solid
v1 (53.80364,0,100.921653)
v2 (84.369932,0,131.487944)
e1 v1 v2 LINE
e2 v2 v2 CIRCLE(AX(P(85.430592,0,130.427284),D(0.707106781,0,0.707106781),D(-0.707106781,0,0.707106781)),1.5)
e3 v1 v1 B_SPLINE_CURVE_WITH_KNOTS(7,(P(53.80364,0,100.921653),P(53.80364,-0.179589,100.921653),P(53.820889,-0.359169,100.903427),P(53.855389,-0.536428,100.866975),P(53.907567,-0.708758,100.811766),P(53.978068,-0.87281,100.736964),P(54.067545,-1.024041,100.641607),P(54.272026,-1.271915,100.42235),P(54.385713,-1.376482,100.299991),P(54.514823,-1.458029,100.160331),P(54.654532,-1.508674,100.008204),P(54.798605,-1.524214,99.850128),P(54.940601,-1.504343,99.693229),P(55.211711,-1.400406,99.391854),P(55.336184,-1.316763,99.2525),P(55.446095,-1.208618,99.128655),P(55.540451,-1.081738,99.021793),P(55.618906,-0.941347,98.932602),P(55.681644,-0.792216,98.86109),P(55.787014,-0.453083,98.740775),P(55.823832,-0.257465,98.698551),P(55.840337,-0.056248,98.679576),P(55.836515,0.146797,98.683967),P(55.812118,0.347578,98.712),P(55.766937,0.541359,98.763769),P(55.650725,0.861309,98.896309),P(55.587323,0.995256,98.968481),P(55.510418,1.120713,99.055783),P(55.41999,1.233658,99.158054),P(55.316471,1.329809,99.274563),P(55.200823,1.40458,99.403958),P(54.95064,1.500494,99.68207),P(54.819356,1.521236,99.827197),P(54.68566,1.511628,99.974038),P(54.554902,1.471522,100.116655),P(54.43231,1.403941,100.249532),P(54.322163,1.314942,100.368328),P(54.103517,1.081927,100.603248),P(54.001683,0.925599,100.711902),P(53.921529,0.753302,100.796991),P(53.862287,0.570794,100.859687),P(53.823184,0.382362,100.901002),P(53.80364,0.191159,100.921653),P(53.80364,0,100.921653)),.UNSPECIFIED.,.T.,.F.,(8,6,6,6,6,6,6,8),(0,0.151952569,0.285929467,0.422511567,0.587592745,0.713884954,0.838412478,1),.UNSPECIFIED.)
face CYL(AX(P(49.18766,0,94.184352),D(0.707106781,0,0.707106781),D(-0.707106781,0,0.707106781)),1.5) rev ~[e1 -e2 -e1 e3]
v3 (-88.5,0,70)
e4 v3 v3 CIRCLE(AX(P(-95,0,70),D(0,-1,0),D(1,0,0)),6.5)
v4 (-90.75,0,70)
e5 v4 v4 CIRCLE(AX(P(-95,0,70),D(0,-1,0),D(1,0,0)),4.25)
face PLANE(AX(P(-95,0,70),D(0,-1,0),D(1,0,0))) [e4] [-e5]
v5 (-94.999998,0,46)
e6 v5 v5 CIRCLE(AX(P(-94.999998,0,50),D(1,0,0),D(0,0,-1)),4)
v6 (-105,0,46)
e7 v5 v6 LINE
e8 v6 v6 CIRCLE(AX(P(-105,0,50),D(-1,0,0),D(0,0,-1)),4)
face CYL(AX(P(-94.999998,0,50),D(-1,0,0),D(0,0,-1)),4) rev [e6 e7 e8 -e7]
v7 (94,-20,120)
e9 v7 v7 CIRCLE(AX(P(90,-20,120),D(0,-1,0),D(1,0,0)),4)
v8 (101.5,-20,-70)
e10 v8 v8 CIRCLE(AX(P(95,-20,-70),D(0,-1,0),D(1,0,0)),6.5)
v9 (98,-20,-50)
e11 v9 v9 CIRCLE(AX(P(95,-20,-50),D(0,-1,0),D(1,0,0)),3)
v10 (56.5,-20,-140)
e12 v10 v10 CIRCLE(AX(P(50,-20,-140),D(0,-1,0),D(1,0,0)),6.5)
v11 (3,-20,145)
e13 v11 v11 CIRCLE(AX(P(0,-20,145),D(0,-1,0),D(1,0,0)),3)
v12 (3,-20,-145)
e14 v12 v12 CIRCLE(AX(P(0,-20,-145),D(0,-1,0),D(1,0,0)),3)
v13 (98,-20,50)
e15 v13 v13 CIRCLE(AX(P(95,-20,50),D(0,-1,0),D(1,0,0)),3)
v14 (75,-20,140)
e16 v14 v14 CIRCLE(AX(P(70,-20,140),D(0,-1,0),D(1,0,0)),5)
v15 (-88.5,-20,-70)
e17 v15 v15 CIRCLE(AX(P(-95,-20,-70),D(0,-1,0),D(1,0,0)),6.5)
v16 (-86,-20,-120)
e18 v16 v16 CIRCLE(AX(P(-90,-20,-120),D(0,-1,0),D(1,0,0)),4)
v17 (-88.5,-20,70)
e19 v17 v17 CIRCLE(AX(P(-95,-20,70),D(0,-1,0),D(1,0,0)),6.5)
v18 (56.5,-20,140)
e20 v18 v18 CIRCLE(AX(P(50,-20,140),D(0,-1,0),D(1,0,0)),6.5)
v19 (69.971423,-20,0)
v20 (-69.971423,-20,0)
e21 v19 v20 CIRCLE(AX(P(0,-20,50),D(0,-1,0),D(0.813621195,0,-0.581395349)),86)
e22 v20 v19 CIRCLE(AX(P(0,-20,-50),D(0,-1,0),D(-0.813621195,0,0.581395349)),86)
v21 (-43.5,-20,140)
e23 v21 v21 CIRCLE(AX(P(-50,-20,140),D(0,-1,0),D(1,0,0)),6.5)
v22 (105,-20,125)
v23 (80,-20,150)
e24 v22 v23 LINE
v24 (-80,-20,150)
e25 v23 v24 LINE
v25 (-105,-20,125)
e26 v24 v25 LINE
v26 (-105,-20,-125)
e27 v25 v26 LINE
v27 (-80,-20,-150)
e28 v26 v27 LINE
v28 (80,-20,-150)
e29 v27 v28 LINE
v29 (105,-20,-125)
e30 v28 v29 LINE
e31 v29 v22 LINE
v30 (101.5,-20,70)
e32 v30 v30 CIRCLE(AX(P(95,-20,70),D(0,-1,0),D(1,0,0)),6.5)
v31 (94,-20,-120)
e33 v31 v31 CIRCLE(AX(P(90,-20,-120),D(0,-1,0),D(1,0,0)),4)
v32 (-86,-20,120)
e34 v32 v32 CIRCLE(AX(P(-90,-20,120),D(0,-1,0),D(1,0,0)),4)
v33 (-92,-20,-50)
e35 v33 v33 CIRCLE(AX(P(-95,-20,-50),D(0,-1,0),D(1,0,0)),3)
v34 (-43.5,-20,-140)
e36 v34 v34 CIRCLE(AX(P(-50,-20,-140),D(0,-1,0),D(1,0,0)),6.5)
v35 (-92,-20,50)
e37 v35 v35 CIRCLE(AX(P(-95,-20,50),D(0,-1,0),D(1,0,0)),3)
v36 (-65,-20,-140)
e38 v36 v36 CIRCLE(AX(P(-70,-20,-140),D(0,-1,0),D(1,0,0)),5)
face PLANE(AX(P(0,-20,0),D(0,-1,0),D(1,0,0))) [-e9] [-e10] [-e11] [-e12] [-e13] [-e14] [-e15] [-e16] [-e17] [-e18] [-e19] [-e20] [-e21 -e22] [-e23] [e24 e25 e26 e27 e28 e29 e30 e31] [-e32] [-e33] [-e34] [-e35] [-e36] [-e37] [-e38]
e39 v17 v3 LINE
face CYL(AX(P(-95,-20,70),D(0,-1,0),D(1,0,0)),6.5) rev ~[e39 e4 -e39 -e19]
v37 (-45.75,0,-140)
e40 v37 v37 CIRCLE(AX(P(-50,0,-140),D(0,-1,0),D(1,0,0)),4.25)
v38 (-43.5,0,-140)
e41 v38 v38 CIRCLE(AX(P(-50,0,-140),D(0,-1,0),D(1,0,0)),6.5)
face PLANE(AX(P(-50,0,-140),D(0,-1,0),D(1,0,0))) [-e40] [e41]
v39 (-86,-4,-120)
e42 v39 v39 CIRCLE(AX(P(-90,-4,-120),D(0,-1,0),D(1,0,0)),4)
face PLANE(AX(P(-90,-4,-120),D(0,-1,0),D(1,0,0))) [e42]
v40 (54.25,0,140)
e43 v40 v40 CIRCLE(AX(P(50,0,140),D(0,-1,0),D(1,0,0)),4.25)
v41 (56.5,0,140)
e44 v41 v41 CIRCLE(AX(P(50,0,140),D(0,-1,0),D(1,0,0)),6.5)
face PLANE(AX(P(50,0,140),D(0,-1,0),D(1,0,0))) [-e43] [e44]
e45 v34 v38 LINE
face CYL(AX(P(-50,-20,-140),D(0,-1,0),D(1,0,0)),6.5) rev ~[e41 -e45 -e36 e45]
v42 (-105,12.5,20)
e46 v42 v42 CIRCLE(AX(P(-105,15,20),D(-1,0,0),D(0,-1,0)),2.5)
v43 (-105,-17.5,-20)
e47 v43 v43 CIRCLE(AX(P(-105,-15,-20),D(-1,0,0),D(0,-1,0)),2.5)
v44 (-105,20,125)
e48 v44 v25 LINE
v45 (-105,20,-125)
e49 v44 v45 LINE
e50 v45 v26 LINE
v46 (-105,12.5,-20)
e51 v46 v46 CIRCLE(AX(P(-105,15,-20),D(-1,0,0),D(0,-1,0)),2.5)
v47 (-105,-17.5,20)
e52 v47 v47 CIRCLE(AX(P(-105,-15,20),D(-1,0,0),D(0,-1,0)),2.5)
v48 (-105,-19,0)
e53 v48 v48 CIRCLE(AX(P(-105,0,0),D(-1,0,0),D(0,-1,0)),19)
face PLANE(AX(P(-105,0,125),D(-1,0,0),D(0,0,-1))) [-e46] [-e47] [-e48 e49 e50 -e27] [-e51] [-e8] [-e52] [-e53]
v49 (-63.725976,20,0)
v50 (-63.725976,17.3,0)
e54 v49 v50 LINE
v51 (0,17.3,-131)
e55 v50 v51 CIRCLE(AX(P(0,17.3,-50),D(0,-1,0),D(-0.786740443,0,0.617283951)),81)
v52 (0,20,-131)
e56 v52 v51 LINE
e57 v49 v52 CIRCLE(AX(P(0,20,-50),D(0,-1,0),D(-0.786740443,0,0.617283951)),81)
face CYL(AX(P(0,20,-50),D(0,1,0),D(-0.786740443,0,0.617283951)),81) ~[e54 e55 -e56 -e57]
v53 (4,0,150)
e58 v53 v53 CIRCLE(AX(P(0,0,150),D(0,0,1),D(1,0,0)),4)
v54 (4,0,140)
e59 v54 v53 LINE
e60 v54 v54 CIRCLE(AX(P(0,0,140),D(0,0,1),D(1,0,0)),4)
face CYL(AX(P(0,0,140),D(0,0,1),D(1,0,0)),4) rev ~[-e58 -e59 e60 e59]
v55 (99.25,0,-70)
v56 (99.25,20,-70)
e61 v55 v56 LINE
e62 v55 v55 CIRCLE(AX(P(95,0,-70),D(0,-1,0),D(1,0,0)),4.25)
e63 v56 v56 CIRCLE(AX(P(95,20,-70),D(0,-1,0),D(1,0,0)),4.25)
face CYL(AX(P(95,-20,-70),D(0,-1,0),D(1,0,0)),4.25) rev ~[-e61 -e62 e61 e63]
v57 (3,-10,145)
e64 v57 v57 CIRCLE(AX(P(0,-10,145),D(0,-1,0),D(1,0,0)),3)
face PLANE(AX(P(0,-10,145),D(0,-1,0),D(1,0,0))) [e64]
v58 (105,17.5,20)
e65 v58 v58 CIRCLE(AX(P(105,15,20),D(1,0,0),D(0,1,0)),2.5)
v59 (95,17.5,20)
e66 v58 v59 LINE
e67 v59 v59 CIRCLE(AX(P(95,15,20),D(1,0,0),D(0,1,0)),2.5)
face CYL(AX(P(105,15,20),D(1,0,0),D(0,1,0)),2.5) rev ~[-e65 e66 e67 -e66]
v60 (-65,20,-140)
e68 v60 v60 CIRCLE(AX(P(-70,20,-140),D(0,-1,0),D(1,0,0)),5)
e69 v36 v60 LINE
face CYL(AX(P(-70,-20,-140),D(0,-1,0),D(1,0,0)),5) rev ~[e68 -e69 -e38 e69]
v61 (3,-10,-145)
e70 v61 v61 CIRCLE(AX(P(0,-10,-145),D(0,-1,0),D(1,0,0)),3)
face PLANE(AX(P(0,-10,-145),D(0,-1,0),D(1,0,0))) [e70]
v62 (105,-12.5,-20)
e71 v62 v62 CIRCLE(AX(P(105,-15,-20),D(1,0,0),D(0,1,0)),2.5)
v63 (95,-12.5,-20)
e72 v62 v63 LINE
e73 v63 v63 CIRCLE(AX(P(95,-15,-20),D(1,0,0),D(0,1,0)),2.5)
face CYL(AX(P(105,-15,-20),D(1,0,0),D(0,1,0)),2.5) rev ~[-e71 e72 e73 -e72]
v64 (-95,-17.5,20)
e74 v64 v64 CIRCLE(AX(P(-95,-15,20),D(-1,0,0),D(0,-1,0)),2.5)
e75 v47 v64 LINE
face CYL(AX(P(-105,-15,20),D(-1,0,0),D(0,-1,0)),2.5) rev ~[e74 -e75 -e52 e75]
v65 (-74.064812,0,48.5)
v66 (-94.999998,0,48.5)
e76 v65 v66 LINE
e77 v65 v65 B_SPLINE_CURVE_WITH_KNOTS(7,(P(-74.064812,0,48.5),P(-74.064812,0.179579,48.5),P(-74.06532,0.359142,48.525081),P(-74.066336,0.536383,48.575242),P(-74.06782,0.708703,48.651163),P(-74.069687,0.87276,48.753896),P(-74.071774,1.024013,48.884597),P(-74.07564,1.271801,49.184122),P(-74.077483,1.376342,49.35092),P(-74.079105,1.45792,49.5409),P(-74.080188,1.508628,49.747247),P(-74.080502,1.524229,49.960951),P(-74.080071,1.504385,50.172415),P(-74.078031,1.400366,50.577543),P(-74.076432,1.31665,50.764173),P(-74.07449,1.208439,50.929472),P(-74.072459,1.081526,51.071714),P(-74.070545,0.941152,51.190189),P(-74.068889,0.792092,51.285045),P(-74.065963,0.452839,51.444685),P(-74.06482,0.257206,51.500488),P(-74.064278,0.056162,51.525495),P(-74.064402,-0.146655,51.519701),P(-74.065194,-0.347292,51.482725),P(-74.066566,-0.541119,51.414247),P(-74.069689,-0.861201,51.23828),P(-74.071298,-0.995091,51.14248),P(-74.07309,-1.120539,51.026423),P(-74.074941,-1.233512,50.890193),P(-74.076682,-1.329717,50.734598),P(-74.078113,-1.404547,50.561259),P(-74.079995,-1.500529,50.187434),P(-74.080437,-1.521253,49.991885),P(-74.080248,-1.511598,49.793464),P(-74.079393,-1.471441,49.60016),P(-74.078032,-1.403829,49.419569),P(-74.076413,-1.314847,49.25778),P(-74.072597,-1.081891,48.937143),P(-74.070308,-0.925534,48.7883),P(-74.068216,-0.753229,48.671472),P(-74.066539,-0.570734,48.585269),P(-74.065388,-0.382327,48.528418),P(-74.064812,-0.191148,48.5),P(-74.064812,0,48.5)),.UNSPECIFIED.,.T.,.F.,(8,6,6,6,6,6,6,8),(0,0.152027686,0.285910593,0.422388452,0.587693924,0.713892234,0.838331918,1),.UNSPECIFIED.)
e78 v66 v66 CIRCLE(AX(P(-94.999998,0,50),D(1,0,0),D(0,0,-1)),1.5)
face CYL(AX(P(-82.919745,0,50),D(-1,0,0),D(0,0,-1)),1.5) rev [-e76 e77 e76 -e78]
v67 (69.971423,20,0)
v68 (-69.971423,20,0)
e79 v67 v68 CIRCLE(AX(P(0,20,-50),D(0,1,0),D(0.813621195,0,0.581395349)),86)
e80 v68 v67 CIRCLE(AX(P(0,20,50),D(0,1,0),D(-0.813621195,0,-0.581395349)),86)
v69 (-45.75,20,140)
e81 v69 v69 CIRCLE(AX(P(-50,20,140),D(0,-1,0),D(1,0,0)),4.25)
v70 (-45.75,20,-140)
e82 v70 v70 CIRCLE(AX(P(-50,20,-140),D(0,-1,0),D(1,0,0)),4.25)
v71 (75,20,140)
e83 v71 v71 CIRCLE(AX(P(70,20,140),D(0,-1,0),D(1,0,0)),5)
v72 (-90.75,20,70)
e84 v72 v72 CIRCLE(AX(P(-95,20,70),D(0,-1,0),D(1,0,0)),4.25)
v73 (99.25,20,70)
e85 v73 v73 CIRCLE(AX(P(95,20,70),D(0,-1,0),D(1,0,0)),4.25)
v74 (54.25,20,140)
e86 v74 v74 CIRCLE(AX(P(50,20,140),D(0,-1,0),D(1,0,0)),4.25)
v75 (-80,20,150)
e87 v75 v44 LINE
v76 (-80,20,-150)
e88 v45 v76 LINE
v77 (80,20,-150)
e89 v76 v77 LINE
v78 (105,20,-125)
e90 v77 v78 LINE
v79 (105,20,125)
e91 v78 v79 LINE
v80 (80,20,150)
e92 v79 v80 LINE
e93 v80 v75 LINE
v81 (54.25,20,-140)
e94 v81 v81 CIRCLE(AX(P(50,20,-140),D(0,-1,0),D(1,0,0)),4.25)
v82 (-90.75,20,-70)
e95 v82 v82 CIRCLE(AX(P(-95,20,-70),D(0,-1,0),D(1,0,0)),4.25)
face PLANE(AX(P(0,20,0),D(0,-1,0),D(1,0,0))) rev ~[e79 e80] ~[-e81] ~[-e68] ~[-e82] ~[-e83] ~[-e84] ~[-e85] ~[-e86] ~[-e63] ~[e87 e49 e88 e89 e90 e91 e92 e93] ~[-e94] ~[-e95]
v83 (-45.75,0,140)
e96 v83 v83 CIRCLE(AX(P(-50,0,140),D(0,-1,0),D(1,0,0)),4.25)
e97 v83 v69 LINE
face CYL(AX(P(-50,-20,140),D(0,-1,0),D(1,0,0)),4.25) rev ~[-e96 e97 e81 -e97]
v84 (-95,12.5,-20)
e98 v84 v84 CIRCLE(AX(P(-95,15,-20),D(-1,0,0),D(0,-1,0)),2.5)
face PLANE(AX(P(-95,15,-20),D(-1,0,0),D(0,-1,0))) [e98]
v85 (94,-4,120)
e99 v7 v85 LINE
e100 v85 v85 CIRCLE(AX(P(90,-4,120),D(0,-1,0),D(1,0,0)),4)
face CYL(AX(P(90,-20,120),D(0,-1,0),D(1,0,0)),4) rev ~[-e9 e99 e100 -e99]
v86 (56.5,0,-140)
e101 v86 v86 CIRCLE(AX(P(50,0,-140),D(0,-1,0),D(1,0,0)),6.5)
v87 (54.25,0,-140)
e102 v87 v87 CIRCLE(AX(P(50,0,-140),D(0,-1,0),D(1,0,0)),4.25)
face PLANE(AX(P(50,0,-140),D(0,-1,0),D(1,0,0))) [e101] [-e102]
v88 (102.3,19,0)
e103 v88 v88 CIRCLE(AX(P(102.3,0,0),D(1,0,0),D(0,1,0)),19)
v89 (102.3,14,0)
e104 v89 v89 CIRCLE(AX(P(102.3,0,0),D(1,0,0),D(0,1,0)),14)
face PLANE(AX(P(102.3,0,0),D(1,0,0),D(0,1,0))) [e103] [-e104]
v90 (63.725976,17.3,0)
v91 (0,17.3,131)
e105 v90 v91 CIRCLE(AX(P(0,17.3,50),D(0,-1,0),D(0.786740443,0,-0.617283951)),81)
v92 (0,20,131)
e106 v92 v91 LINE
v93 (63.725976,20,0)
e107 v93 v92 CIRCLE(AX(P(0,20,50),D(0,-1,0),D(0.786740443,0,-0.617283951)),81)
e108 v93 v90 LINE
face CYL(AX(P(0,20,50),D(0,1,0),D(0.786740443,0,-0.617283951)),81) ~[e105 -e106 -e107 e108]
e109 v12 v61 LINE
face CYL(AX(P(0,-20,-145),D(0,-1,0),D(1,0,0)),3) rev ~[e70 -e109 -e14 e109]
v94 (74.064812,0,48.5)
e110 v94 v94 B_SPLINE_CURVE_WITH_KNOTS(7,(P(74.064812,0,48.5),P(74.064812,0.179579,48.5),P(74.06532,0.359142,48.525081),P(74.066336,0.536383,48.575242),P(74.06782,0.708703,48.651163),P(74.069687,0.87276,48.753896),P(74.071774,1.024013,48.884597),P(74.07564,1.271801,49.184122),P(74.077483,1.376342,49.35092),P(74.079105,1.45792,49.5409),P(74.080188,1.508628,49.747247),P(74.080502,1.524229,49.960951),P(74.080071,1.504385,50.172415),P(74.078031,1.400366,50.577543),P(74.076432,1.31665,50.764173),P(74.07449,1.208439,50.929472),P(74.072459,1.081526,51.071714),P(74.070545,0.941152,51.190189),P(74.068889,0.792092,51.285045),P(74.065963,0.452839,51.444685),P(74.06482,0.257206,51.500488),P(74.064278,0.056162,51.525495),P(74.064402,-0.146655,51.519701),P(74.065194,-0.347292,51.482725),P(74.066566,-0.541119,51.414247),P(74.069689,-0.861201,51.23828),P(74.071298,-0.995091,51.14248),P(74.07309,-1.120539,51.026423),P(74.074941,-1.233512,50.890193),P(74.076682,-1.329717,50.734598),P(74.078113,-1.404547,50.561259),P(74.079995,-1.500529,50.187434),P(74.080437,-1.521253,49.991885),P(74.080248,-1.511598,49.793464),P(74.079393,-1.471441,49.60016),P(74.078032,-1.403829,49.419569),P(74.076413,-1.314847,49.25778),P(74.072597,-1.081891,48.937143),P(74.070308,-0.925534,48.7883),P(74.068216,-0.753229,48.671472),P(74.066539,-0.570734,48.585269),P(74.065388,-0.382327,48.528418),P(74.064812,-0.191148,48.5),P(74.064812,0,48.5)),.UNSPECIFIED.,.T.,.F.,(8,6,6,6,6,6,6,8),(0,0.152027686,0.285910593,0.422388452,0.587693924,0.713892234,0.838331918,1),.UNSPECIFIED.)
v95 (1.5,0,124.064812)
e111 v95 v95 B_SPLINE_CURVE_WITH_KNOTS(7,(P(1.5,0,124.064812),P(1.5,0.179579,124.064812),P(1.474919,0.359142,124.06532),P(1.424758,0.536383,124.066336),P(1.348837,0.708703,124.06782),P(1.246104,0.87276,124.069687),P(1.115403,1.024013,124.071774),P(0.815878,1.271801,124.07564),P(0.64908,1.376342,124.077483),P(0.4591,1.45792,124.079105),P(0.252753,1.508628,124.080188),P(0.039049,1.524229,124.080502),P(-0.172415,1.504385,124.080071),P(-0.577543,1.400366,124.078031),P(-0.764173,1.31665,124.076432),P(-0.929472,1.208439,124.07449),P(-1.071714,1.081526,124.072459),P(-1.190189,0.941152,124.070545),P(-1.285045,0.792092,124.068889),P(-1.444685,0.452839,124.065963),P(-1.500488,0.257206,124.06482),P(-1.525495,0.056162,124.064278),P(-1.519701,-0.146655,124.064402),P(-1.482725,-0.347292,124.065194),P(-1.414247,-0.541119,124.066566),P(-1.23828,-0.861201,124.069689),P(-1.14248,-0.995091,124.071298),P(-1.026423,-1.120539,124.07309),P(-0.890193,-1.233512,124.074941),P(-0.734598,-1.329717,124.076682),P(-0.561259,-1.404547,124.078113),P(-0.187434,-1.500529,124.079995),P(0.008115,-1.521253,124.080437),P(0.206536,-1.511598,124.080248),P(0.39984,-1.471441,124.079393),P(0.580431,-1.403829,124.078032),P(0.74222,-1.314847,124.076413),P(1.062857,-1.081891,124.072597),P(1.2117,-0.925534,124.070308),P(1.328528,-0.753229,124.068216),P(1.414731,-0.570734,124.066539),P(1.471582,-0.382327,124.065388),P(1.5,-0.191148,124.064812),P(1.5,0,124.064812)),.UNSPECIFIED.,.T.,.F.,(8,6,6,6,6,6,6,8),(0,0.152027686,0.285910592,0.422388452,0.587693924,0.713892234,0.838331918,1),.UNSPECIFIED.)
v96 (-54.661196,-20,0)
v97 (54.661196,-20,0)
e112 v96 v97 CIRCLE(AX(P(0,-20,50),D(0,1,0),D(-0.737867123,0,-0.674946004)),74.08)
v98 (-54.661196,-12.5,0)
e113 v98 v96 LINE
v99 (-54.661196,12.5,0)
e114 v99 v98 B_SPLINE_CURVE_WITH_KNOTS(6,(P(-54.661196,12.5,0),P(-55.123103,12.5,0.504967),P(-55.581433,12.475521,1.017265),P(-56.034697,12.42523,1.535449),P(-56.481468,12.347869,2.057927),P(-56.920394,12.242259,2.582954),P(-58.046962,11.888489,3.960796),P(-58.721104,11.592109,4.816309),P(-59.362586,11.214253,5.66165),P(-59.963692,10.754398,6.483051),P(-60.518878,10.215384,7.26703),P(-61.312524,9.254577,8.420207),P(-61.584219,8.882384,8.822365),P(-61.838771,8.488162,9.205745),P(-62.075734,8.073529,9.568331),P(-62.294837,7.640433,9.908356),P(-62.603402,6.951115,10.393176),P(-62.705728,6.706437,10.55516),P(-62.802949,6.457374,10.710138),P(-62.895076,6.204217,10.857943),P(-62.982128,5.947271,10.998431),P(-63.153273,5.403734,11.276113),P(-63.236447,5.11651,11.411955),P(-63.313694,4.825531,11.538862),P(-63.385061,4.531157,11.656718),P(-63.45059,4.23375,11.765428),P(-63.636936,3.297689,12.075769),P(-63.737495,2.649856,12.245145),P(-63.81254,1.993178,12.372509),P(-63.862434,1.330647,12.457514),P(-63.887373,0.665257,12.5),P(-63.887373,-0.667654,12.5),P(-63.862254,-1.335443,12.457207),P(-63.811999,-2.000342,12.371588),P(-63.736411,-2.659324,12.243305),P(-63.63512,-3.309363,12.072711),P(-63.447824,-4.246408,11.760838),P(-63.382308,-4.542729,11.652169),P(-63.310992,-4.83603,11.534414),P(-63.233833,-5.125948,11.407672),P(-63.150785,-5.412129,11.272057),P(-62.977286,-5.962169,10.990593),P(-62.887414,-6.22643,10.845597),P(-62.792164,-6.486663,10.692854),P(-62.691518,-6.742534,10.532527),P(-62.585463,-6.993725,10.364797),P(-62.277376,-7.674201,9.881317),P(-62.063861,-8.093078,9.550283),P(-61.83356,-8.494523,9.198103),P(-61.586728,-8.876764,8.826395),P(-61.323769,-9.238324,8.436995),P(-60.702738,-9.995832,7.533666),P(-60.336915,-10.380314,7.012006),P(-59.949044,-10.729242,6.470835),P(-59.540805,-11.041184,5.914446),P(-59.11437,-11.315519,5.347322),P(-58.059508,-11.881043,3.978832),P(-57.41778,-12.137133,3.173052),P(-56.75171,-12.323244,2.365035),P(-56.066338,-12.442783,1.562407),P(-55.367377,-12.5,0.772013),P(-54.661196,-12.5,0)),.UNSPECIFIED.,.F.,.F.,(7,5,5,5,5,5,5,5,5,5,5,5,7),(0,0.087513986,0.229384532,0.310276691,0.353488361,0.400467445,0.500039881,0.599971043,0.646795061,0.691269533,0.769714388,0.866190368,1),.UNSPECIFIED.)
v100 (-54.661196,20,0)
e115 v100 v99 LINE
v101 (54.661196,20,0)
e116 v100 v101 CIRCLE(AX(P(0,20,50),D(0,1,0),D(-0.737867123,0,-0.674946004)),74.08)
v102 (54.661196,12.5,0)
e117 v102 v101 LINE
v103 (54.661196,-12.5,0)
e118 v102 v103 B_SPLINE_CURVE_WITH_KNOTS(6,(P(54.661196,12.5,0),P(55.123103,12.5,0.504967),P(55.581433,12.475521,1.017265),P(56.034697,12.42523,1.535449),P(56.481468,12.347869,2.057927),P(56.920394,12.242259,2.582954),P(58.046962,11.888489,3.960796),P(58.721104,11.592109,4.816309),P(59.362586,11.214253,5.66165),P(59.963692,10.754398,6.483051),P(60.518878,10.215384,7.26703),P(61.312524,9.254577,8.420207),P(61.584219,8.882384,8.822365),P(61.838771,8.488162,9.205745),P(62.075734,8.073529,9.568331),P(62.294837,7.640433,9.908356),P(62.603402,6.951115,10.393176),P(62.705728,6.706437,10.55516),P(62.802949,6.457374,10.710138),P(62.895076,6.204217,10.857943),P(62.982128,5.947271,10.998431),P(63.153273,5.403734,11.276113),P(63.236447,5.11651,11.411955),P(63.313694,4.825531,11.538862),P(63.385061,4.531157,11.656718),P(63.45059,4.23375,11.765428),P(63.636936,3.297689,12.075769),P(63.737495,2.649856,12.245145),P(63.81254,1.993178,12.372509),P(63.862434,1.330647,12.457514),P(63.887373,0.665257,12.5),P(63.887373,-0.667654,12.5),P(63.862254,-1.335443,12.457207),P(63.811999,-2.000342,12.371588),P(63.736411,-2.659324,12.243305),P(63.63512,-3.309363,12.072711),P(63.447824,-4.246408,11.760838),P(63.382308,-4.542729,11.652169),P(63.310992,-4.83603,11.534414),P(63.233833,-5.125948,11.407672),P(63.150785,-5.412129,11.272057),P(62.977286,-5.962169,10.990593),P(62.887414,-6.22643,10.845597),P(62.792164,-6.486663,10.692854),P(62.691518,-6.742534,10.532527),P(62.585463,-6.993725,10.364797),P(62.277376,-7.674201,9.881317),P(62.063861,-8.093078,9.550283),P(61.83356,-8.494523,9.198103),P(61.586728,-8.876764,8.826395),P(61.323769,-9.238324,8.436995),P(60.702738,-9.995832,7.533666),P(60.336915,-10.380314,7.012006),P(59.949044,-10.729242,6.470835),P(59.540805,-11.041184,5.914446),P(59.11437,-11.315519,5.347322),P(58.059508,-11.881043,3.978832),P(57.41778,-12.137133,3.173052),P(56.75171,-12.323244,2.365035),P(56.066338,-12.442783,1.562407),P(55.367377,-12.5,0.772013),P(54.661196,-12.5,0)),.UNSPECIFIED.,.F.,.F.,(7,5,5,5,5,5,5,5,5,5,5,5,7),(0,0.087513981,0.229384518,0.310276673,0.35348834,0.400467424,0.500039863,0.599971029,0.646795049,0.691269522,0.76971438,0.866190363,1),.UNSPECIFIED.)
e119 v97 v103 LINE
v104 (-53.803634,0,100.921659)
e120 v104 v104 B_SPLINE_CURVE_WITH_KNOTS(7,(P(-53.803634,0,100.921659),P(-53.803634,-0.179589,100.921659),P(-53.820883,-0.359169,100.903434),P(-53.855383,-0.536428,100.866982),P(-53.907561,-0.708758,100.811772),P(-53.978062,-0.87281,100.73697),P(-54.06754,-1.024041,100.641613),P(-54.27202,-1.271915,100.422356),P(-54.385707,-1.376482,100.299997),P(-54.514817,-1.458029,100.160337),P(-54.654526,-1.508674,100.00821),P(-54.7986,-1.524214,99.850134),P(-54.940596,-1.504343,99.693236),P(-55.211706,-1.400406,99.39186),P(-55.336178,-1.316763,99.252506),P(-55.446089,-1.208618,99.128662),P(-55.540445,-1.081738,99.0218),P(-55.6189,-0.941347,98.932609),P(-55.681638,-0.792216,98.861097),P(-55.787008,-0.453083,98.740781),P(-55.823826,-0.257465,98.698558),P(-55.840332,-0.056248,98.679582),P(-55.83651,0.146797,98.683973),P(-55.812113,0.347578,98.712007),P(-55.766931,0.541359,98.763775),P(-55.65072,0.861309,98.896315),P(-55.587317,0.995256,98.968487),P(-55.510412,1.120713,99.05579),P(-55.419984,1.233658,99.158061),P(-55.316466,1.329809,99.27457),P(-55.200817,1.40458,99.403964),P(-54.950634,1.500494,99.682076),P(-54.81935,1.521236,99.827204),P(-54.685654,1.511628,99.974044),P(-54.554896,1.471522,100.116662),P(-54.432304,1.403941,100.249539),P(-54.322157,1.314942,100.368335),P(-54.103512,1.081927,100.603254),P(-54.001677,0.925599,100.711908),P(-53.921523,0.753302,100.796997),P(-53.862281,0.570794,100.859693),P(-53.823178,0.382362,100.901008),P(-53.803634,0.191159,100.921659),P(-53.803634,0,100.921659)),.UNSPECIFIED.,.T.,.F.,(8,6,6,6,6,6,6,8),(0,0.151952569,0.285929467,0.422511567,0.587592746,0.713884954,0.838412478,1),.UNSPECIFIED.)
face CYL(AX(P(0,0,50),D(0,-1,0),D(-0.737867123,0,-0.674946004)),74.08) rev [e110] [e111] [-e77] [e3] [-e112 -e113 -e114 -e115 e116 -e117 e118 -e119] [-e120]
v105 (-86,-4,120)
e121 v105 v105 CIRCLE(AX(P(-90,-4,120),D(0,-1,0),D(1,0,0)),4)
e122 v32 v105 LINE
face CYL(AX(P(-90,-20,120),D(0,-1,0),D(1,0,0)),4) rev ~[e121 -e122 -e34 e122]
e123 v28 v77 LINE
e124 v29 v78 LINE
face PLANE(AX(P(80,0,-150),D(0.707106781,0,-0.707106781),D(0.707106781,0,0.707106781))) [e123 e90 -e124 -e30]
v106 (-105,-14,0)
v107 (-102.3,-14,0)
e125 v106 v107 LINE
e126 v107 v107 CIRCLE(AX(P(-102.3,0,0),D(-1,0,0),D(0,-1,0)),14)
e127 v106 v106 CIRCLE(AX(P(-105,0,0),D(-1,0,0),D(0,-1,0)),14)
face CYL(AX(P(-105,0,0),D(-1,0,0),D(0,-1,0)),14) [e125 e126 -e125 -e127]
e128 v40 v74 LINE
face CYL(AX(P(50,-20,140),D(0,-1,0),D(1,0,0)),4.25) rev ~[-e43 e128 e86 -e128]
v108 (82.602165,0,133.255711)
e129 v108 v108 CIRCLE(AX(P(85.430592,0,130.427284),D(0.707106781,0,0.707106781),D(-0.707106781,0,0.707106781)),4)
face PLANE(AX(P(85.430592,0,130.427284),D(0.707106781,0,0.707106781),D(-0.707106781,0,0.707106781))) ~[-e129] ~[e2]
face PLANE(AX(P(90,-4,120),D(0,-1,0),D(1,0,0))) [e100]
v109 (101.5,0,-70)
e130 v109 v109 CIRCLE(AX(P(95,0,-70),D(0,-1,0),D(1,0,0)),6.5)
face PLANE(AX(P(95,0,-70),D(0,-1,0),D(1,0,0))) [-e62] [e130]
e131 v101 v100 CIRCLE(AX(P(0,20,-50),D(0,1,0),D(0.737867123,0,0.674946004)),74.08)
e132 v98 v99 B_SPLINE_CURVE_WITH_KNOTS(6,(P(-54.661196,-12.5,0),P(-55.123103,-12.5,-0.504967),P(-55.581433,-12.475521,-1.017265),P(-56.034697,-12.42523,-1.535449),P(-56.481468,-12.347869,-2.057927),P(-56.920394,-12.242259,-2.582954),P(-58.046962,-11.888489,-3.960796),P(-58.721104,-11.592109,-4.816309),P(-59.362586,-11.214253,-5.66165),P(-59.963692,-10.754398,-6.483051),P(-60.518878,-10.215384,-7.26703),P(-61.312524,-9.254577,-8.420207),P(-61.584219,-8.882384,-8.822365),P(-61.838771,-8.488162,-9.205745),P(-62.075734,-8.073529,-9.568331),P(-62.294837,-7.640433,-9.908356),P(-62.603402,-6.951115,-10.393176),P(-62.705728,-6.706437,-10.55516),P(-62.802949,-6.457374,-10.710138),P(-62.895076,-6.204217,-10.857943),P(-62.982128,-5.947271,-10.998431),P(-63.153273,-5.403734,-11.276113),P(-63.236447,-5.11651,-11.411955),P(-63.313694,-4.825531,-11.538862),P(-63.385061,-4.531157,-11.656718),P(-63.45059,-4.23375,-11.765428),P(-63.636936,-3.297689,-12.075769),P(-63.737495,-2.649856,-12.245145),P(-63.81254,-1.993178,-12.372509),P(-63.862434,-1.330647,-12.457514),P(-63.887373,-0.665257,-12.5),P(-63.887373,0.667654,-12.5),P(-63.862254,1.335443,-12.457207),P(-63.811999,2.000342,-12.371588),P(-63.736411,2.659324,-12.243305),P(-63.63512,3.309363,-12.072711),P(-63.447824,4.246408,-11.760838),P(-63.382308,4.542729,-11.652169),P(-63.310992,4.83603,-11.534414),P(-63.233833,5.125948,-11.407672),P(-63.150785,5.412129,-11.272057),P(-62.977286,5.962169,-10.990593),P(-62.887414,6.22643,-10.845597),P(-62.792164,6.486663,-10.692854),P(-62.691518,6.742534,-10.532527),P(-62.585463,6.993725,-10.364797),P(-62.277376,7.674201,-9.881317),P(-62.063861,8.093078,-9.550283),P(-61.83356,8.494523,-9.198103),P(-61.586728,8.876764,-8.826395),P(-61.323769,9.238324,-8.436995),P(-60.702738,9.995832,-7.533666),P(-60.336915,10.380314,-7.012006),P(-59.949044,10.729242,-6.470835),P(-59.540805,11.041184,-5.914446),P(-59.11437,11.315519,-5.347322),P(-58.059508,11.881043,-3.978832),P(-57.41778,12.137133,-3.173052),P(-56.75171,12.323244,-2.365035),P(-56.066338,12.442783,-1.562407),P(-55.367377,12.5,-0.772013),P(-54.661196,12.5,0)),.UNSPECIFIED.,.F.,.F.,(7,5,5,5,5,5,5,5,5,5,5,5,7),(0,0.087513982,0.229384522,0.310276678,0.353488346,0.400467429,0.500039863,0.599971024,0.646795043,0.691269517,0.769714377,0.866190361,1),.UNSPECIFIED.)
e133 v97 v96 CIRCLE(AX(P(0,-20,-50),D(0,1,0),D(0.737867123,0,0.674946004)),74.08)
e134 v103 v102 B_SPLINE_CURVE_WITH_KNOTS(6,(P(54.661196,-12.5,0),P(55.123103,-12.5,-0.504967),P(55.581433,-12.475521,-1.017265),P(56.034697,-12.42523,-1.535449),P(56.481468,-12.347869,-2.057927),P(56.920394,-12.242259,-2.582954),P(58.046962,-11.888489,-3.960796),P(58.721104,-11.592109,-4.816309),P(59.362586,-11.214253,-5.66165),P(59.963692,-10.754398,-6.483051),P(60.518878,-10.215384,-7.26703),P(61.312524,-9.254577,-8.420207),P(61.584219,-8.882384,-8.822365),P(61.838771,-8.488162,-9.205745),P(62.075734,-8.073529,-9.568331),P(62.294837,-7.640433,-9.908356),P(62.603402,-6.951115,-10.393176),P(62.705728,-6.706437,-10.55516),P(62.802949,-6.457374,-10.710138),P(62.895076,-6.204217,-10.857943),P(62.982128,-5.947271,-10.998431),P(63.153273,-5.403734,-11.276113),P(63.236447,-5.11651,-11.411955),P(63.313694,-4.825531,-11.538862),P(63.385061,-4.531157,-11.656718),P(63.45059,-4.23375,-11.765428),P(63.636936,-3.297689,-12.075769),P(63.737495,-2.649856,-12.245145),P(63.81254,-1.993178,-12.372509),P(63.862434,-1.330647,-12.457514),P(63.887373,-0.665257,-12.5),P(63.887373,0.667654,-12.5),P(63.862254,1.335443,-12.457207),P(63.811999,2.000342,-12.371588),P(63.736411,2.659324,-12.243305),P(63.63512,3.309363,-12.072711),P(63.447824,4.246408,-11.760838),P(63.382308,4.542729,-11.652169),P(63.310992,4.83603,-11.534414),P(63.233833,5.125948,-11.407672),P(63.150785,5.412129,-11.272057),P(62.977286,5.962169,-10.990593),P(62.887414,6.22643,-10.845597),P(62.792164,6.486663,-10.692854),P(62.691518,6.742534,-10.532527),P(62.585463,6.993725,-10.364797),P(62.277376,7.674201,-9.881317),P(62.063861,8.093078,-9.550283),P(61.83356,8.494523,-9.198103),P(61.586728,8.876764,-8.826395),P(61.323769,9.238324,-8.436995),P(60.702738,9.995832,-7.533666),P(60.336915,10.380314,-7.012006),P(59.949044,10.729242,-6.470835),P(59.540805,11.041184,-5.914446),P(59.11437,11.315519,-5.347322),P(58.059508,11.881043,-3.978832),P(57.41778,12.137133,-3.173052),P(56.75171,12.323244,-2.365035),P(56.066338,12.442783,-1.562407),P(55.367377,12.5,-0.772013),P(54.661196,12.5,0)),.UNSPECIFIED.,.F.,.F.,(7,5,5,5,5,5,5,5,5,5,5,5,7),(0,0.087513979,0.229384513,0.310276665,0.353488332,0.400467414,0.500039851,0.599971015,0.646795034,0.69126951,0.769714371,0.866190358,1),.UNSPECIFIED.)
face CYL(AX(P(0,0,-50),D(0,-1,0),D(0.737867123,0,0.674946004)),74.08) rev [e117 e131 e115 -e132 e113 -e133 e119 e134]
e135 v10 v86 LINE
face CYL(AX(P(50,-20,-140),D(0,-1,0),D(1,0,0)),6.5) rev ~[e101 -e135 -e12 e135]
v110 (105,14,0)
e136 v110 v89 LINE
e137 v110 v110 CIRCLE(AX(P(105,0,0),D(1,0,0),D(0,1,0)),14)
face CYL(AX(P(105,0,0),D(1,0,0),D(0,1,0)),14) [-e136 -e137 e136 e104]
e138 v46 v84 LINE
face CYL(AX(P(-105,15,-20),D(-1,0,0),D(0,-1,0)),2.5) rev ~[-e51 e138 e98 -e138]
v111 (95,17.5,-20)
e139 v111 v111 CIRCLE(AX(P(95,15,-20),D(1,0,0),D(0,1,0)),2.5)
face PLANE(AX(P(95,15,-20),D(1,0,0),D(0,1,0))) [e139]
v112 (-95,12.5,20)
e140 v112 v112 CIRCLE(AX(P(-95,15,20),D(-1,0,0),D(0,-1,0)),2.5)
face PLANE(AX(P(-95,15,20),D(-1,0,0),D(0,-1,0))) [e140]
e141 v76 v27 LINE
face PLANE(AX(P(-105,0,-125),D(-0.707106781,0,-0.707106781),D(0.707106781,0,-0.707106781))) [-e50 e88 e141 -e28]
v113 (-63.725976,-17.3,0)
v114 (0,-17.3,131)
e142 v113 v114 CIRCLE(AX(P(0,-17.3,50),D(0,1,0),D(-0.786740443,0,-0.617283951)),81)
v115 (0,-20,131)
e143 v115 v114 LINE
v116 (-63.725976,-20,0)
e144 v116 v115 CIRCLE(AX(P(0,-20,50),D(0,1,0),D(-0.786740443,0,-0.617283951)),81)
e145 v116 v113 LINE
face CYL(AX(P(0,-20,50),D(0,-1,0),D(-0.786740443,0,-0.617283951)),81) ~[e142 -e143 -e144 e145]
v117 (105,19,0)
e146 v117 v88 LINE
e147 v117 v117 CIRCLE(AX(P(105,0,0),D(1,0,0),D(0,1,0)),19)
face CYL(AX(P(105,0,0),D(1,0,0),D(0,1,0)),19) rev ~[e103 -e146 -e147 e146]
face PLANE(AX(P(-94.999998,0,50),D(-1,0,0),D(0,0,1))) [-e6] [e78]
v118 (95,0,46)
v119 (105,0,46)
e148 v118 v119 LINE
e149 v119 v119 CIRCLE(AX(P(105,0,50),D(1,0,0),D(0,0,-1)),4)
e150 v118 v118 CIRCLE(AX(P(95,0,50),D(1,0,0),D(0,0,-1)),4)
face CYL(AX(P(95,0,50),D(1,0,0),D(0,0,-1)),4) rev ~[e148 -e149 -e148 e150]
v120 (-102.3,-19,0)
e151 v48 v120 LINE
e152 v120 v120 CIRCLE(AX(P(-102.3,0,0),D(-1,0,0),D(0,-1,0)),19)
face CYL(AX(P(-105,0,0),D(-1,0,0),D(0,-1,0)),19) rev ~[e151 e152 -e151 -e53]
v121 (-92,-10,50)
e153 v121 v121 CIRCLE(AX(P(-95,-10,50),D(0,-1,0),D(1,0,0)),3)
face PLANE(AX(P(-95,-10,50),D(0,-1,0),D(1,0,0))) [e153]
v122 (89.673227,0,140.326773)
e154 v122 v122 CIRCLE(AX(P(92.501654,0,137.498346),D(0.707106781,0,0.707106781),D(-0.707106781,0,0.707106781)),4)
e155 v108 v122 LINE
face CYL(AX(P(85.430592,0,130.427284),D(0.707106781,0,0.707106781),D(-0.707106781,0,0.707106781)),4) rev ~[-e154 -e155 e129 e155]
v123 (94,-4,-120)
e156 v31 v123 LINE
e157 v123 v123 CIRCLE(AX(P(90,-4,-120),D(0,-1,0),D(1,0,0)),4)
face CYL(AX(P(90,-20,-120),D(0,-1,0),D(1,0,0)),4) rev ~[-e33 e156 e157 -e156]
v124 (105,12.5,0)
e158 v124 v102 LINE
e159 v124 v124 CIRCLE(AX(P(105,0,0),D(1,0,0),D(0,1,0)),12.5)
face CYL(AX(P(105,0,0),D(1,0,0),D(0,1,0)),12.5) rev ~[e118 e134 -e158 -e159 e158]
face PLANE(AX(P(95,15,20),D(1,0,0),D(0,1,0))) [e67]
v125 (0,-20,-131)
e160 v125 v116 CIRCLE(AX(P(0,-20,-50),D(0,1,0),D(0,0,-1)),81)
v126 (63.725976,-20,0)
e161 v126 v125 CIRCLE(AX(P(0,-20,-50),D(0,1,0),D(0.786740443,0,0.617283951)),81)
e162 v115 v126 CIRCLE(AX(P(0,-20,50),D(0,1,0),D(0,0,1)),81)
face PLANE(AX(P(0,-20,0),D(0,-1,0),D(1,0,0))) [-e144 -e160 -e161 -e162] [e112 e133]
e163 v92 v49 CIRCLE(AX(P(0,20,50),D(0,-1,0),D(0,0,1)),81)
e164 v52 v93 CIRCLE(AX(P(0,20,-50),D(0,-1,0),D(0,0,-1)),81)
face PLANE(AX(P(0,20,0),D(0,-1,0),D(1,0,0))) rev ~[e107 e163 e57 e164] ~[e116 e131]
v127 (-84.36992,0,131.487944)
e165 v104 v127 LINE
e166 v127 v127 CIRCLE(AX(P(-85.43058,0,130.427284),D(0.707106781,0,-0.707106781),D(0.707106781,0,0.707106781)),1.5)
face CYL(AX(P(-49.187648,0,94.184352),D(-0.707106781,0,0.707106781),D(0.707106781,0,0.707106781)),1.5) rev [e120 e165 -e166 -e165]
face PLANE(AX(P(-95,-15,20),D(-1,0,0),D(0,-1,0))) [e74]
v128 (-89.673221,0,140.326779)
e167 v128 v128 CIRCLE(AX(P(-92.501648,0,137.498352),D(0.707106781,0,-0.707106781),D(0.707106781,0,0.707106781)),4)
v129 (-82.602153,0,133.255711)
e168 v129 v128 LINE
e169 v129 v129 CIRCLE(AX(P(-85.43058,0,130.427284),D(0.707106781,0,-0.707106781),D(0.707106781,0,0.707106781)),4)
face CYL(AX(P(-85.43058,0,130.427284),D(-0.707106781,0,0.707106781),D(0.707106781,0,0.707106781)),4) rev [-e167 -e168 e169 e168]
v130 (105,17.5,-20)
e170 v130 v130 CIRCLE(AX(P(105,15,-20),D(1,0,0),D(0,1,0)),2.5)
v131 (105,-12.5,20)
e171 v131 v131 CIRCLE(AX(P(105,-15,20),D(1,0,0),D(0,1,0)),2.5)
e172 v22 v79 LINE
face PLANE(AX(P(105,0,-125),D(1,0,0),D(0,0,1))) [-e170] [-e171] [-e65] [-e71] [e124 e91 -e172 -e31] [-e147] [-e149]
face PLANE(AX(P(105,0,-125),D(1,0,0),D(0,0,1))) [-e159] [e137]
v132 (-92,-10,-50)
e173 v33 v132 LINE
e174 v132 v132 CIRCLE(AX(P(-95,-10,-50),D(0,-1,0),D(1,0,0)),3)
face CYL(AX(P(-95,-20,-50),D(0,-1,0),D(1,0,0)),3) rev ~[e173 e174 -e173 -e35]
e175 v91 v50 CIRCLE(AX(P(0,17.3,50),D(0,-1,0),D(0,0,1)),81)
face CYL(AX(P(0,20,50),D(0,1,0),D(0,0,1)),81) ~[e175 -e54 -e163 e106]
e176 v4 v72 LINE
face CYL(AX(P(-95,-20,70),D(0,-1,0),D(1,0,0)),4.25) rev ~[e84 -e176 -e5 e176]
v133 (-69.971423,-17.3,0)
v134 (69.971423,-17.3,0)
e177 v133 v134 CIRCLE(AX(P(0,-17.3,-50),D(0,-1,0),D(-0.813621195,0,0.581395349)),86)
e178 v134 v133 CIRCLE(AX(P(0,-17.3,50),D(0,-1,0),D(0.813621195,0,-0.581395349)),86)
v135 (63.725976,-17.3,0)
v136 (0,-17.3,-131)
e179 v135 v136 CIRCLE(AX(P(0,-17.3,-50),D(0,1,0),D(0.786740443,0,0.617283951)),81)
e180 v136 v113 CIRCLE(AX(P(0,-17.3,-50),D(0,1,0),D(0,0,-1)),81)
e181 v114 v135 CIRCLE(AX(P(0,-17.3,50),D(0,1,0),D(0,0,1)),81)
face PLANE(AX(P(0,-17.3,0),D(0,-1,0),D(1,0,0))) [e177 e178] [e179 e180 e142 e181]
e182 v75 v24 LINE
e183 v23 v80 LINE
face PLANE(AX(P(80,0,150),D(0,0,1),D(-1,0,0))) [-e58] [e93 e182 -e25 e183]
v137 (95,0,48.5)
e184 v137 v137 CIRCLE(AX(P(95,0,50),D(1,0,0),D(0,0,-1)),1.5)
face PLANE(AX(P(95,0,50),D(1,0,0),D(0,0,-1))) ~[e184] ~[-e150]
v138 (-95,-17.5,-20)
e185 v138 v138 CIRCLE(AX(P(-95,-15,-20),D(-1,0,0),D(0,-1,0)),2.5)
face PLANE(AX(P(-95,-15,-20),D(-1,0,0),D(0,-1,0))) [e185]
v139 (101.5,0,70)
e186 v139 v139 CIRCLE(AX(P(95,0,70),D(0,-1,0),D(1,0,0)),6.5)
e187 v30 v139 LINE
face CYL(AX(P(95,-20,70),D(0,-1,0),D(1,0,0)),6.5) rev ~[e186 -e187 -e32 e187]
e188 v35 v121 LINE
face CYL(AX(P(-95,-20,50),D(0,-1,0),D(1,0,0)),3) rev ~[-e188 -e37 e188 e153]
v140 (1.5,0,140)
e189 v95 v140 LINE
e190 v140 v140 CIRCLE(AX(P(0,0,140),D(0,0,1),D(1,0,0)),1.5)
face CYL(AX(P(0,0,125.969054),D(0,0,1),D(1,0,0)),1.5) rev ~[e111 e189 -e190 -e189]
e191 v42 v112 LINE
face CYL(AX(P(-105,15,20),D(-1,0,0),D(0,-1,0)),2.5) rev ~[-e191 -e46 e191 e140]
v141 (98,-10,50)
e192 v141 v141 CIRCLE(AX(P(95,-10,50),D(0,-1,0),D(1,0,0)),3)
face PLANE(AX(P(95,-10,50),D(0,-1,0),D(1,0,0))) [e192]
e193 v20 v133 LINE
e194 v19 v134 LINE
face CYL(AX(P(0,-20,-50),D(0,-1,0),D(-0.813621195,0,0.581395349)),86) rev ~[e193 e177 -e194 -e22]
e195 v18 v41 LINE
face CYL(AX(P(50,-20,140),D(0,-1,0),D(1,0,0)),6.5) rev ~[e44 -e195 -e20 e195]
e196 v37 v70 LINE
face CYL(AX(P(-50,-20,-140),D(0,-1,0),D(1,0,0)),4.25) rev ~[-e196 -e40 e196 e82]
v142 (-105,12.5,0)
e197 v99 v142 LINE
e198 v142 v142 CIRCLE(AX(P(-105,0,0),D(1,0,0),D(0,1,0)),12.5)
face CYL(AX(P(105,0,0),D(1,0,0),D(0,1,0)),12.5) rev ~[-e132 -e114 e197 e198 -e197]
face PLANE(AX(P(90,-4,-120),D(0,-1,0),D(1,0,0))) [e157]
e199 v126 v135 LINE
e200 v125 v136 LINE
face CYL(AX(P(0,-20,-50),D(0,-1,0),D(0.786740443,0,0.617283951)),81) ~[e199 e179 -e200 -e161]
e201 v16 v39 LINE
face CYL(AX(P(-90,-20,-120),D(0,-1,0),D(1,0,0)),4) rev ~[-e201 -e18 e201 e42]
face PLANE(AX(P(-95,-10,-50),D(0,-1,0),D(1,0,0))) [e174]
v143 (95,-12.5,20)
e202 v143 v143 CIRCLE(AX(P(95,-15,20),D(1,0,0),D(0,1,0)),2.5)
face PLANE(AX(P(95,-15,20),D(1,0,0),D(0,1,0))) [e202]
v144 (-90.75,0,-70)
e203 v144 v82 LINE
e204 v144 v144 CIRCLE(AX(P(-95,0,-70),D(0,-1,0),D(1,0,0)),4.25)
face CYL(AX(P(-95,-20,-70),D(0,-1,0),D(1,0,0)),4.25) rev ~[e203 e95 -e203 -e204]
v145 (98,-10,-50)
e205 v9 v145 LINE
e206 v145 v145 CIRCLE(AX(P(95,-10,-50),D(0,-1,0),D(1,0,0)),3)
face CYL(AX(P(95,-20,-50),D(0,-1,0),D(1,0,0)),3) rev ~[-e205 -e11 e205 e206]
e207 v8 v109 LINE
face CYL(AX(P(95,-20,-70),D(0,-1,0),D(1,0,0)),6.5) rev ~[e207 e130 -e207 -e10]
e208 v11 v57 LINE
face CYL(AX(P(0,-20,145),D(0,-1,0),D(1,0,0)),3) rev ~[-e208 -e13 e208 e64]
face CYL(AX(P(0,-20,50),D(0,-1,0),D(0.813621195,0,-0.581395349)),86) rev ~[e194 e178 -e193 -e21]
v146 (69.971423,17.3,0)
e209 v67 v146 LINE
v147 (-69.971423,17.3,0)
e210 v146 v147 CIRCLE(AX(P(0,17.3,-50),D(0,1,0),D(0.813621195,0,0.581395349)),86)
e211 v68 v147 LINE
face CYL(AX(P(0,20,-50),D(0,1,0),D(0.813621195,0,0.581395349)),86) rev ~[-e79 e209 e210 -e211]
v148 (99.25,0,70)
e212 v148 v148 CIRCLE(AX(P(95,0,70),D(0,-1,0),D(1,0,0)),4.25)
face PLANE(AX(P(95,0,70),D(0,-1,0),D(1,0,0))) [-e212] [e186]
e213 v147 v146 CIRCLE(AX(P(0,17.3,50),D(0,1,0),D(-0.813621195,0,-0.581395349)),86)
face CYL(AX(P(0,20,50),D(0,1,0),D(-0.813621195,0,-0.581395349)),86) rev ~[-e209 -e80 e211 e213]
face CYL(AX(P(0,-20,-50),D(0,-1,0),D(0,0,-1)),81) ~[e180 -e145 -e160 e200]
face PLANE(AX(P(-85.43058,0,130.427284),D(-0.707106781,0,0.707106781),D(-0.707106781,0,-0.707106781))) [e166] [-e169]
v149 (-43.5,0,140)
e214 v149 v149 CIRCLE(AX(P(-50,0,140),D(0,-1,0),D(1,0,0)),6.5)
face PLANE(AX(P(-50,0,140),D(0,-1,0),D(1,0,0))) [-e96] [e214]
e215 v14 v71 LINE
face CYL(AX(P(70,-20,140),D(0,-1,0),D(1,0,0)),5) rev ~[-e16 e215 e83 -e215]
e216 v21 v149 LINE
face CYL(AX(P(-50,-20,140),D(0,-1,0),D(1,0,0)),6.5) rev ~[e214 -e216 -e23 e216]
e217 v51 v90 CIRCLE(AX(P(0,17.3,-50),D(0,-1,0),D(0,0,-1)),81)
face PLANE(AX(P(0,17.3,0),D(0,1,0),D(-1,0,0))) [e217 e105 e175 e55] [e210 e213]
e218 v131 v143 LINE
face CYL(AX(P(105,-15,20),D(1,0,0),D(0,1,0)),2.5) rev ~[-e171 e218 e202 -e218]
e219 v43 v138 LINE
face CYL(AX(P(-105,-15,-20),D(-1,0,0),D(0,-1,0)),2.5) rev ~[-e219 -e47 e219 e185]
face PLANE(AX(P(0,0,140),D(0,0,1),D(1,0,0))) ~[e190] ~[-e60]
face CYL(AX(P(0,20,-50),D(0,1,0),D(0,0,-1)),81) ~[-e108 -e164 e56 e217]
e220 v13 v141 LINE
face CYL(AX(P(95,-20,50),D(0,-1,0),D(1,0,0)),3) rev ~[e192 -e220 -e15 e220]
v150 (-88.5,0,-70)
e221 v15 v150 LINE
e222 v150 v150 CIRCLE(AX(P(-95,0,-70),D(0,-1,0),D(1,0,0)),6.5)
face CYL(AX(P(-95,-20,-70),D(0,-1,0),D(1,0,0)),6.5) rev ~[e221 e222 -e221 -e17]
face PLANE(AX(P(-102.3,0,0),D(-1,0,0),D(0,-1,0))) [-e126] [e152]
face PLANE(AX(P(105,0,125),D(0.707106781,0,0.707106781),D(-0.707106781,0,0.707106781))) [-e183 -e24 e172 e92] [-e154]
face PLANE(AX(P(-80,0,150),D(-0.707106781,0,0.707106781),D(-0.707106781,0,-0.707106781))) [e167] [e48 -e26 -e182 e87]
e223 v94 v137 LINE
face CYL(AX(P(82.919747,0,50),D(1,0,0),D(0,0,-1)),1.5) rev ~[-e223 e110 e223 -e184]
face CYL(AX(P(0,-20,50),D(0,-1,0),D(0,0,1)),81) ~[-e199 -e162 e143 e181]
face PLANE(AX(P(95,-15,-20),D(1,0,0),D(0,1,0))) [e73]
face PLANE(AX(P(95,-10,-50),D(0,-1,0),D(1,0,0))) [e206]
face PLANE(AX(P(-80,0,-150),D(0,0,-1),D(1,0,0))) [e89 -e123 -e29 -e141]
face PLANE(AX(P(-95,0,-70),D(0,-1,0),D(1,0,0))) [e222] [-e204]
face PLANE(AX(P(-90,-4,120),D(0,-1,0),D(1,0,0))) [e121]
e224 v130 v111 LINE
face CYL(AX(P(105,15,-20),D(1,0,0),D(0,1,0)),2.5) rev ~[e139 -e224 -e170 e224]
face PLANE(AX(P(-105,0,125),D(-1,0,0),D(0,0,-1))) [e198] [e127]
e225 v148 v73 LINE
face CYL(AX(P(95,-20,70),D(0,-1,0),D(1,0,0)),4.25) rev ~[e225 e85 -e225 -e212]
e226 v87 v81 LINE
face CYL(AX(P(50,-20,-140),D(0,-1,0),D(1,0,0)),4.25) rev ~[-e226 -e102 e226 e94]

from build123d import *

# Parameters (mm, degrees)
F1_DEPTH  = 20
F2_R      = 12.5
F3_DEPTH  = 210.001
F4_R      = 19
F4_R_2    = 14
F5_DEPTH  = 2.7
F6_R      = 19
F6_R_2    = 14
F7_DEPTH  = 2.7
F9_DEPTH  = 2.7
F11_DEPTH = 2.7
F12_R     = 2.5
F13_DEPTH = 10
F14_R     = 2.5
F15_DEPTH = 10
F16_R     = 6.5
F17_DEPTH = 20
F18_R     = 4.25
F19_DEPTH = 40.0010001
F20_R     = 3
F21_DEPTH = 10
F24_W     = 1.5
F24_H     = 28.0618912584
F26_W     = 24.1605055332
F26_H     = 1.5
F28_R     = 5
F29_DEPTH = 40.0010001
F30_R     = 4
F31_DEPTH = 16


# Not quite as in the source:
# - a pattern or mirror of a feature is missing from the dataset's text; its kind, count and spacing are read off the source's solid


with BuildPart() as f1:
    # F0 (on Front) → F1 (new body, symmetric)
    with BuildSketch(Plane.XZ):
        Polygon((80, 150), (-80, 150), (-105, 125), (-105, -125), (-80, -150), (80, -150), (105, -125), (105, 125), align=None)
        with BuildLine():
            ThreePointArc((-54.6611964743, 0), (0, 124.08), (54.6611964743, 0))
            ThreePointArc((54.6611964743, 0), (0, -124.08), (-54.6611964743, 0))
        make_face(mode=Mode.SUBTRACT)
    extrude(amount=F1_DEPTH, both=True)

    # F2 (on face) → F3 (cut, through all)
    with BuildSketch(Plane.YZ.offset(105)):
        Circle(F2_R)
    extrude(amount=-F3_DEPTH, mode=Mode.SUBTRACT)

    # F4 (on face) → F5 (cut)
    with BuildSketch(Plane.YZ.offset(105)):
        Circle(F4_R)
        Circle(F4_R_2, mode=Mode.SUBTRACT)
    extrude(amount=-F5_DEPTH, mode=Mode.SUBTRACT)

    # F6 (on face) → F7 (cut)
    with BuildSketch(Plane(origin=(-105, 0, 0), x_dir=(0, -1, 0), z_dir=(-1, 0, 0))):
        Circle(F6_R)
        Circle(F6_R_2, mode=Mode.SUBTRACT)
    extrude(amount=-F7_DEPTH, mode=Mode.SUBTRACT)

    # F8 (on face) → F9 (cut)
    with BuildSketch(Plane(origin=(0, 20, 0), x_dir=(-1, 0, 0), z_dir=(0, 1, 0))):
        with BuildLine():
            ThreePointArc((-69.9714227381, 0), (0, -136), (69.9714227381, 0))
            ThreePointArc((69.9714227381, 0), (0, 136), (-69.9714227381, 0))
        make_face()
        with BuildLine():
            ThreePointArc((0, 131), (72.8388632531, 85.4330354331), (63.7259758654, 0))
            ThreePointArc((63.7259758654, 0), (72.8388632531, -85.4330354331), (0, -131))
            ThreePointArc((0, -131), (-72.8388632531, -85.4330354331), (-63.7259758654, 0))
            ThreePointArc((-63.7259758654, 0), (-72.8388632531, 85.4330354331), (0, 131))
        make_face(mode=Mode.SUBTRACT)
    extrude(amount=-F9_DEPTH, mode=Mode.SUBTRACT)

    # F10 (on face) → F11 (cut)
    with BuildSketch(Plane.XZ.offset(20)):
        with BuildLine():
            ThreePointArc((69.9714227381, 0), (0, 136), (-69.9714227381, 0))
            ThreePointArc((-69.9714227381, 0), (0, -136), (69.9714227381, 0))
        make_face()
        with BuildLine():
            ThreePointArc((0, 131), (72.8388632531, 85.4330354331), (63.7259758654, 0))
            ThreePointArc((63.7259758654, 0), (72.8388632531, -85.4330354331), (0, -131))
            ThreePointArc((0, -131), (-72.8388632531, -85.4330354331), (-63.7259758654, 0))
            ThreePointArc((-63.7259758654, 0), (-72.8388632531, 85.4330354331), (0, 131))
        make_face(mode=Mode.SUBTRACT)
    extrude(amount=-F11_DEPTH, mode=Mode.SUBTRACT)

    # F12 (on face) → F13 (cut)
    with BuildSketch(Plane.YZ.offset(105)):
        with Locations((-15, 20)):
            Circle(F12_R)
        with Locations((15, 20)):
            Circle(F12_R)
        with Locations((15, -20)):
            Circle(F12_R)
        with Locations((-15, -20)):
            Circle(F12_R)
    extrude(amount=-F13_DEPTH, mode=Mode.SUBTRACT)

    # F14 (on face) → F15 (cut)
    with BuildSketch(Plane(origin=(-105, 0, 0), x_dir=(0, -1, 0), z_dir=(-1, 0, 0))):
        with Locations((-15, 20)):
            Circle(F14_R)
        with Locations((15, 20)):
            Circle(F14_R)
        with Locations((15, -20)):
            Circle(F14_R)
        with Locations((-15, -20)):
            Circle(F14_R)
    extrude(amount=-F15_DEPTH, mode=Mode.SUBTRACT)

    # F16 (on face) → F17 (cut)
    with BuildSketch(Plane.XZ.offset(20)):
        with Locations((-50, 140)):
            Circle(F16_R)
        with Locations((50, 140)):
            Circle(F16_R)
        with Locations((-50, -140)):
            Circle(F16_R)
        with Locations((50, -140)):
            Circle(F16_R)
        with Locations((95, 70)):
            Circle(F16_R)
        with Locations((95, -70)):
            Circle(F16_R)
        with Locations((-95, 70)):
            Circle(F16_R)
        with Locations((-95, -70)):
            Circle(F16_R)
    extrude(amount=-F17_DEPTH, mode=Mode.SUBTRACT)

    # F18 (on face) → F19 (cut, through all)
    with BuildSketch(Plane.XZ.offset(20)):
        with Locations((-50, 140)):
            Circle(F18_R)
        with Locations((50, 140)):
            Circle(F18_R)
        with Locations((95, 70)):
            Circle(F18_R)
        with Locations((95, -70)):
            Circle(F18_R)
        with Locations((50, -140)):
            Circle(F18_R)
        with Locations((-50, -140)):
            Circle(F18_R)
        with Locations((-95, -70)):
            Circle(F18_R)
        with Locations((-95, 70)):
            Circle(F18_R)
    extrude(amount=-F19_DEPTH, mode=Mode.SUBTRACT)

    # F20 (on face) → F21 (cut)
    with BuildSketch(Plane.XZ.offset(20)):
        with Locations((0, 145)):
            Circle(F20_R)
        with Locations((-95, 50)):
            Circle(F20_R)
        with Locations((-95, -50)):
            Circle(F20_R)
        with Locations((95, -50)):
            Circle(F20_R)
        with Locations((95, 50)):
            Circle(F20_R)
        with Locations((0, -145)):
            Circle(F20_R)
    extrude(amount=-F21_DEPTH, mode=Mode.SUBTRACT)

    # F22 (on Front) → F23 (revolve, cut)
    with BuildSketch(Plane.XZ):
        Polygon((-89.6732207666, 140.3267792334), (-92.5016478914, 137.4983521086), (-85.4305800795, 130.4272842968), (-84.3699199077, 131.4879444685), (-82.6021529548, 133.2557114215), align=None)
        Polygon((-84.3699199077, 131.4879444685), (-85.4305800795, 130.4272842968), (-49.1876475233, 94.1843517405), (-48.1269873515, 95.2450119123), align=None)
    f23 = revolve(axis=Axis((-46.2508239457, 0, 91.2475281629), (0.7071067812, 0, -0.7071067812)), mode=Mode.SUBTRACT)

    # F23_copies: F23 across plane
    add(f23.mirror(Plane(origin=(6e-06, 0, 0), x_dir=(0, 0, 1), z_dir=(1, 0, 0))), mode=Mode.SUBTRACT)

    # F24 (on Front) → F25 (revolve, cut)
    with BuildSketch(Plane.XZ):
        with Locations((0.75, 125.9690543708)):
            Rectangle(F24_W, F24_H)
        Polygon((0, 162.6632596409), (0, 140), (1.5, 140), (4, 140), (4, 162.6632596409), align=None)
    revolve(axis=Axis((0, 0, 81.3316298204), (0, 0, 1)), mode=Mode.SUBTRACT)

    # F26 (on Front) → F27 (revolve, cut)
    with BuildSketch(Plane.XZ):
        with Locations((82.9197472334, 49.25)):
            Rectangle(F26_W, F26_H)
        Polygon((111.5470026106, 50), (95, 50), (95, 48.5), (95, 46), (111.5470026106, 46), align=None)
    f27 = revolve(axis=Axis((9.1493800282, 0, 50), (1, 0, 0)), mode=Mode.SUBTRACT)

    # F27_copies: F27 across plane
    add(f27.mirror(Plane(origin=(1e-06, 0, 0), x_dir=(0, 0, -1), z_dir=(-1, 0, 0))), mode=Mode.SUBTRACT)

    # F28 (on face) → F29 (cut, through all)
    with BuildSketch(Plane.XZ.offset(20)):
        with Locations((70, 140)):
            Circle(F28_R)
        with Locations((-70, -140)):
            Circle(F28_R)
    extrude(amount=-F29_DEPTH, mode=Mode.SUBTRACT)

    # F30 (on face) → F31 (cut)
    with BuildSketch(Plane.XZ.offset(20)):
        with Locations((-90, 120)):
            Circle(F30_R)
        with Locations((90, 120)):
            Circle(F30_R)
        with Locations((90, -120)):
            Circle(F30_R)
        with Locations((-90, -120)):
            Circle(F30_R)
    extrude(amount=-F31_DEPTH, mode=Mode.SUBTRACT)


solid = f1.part
